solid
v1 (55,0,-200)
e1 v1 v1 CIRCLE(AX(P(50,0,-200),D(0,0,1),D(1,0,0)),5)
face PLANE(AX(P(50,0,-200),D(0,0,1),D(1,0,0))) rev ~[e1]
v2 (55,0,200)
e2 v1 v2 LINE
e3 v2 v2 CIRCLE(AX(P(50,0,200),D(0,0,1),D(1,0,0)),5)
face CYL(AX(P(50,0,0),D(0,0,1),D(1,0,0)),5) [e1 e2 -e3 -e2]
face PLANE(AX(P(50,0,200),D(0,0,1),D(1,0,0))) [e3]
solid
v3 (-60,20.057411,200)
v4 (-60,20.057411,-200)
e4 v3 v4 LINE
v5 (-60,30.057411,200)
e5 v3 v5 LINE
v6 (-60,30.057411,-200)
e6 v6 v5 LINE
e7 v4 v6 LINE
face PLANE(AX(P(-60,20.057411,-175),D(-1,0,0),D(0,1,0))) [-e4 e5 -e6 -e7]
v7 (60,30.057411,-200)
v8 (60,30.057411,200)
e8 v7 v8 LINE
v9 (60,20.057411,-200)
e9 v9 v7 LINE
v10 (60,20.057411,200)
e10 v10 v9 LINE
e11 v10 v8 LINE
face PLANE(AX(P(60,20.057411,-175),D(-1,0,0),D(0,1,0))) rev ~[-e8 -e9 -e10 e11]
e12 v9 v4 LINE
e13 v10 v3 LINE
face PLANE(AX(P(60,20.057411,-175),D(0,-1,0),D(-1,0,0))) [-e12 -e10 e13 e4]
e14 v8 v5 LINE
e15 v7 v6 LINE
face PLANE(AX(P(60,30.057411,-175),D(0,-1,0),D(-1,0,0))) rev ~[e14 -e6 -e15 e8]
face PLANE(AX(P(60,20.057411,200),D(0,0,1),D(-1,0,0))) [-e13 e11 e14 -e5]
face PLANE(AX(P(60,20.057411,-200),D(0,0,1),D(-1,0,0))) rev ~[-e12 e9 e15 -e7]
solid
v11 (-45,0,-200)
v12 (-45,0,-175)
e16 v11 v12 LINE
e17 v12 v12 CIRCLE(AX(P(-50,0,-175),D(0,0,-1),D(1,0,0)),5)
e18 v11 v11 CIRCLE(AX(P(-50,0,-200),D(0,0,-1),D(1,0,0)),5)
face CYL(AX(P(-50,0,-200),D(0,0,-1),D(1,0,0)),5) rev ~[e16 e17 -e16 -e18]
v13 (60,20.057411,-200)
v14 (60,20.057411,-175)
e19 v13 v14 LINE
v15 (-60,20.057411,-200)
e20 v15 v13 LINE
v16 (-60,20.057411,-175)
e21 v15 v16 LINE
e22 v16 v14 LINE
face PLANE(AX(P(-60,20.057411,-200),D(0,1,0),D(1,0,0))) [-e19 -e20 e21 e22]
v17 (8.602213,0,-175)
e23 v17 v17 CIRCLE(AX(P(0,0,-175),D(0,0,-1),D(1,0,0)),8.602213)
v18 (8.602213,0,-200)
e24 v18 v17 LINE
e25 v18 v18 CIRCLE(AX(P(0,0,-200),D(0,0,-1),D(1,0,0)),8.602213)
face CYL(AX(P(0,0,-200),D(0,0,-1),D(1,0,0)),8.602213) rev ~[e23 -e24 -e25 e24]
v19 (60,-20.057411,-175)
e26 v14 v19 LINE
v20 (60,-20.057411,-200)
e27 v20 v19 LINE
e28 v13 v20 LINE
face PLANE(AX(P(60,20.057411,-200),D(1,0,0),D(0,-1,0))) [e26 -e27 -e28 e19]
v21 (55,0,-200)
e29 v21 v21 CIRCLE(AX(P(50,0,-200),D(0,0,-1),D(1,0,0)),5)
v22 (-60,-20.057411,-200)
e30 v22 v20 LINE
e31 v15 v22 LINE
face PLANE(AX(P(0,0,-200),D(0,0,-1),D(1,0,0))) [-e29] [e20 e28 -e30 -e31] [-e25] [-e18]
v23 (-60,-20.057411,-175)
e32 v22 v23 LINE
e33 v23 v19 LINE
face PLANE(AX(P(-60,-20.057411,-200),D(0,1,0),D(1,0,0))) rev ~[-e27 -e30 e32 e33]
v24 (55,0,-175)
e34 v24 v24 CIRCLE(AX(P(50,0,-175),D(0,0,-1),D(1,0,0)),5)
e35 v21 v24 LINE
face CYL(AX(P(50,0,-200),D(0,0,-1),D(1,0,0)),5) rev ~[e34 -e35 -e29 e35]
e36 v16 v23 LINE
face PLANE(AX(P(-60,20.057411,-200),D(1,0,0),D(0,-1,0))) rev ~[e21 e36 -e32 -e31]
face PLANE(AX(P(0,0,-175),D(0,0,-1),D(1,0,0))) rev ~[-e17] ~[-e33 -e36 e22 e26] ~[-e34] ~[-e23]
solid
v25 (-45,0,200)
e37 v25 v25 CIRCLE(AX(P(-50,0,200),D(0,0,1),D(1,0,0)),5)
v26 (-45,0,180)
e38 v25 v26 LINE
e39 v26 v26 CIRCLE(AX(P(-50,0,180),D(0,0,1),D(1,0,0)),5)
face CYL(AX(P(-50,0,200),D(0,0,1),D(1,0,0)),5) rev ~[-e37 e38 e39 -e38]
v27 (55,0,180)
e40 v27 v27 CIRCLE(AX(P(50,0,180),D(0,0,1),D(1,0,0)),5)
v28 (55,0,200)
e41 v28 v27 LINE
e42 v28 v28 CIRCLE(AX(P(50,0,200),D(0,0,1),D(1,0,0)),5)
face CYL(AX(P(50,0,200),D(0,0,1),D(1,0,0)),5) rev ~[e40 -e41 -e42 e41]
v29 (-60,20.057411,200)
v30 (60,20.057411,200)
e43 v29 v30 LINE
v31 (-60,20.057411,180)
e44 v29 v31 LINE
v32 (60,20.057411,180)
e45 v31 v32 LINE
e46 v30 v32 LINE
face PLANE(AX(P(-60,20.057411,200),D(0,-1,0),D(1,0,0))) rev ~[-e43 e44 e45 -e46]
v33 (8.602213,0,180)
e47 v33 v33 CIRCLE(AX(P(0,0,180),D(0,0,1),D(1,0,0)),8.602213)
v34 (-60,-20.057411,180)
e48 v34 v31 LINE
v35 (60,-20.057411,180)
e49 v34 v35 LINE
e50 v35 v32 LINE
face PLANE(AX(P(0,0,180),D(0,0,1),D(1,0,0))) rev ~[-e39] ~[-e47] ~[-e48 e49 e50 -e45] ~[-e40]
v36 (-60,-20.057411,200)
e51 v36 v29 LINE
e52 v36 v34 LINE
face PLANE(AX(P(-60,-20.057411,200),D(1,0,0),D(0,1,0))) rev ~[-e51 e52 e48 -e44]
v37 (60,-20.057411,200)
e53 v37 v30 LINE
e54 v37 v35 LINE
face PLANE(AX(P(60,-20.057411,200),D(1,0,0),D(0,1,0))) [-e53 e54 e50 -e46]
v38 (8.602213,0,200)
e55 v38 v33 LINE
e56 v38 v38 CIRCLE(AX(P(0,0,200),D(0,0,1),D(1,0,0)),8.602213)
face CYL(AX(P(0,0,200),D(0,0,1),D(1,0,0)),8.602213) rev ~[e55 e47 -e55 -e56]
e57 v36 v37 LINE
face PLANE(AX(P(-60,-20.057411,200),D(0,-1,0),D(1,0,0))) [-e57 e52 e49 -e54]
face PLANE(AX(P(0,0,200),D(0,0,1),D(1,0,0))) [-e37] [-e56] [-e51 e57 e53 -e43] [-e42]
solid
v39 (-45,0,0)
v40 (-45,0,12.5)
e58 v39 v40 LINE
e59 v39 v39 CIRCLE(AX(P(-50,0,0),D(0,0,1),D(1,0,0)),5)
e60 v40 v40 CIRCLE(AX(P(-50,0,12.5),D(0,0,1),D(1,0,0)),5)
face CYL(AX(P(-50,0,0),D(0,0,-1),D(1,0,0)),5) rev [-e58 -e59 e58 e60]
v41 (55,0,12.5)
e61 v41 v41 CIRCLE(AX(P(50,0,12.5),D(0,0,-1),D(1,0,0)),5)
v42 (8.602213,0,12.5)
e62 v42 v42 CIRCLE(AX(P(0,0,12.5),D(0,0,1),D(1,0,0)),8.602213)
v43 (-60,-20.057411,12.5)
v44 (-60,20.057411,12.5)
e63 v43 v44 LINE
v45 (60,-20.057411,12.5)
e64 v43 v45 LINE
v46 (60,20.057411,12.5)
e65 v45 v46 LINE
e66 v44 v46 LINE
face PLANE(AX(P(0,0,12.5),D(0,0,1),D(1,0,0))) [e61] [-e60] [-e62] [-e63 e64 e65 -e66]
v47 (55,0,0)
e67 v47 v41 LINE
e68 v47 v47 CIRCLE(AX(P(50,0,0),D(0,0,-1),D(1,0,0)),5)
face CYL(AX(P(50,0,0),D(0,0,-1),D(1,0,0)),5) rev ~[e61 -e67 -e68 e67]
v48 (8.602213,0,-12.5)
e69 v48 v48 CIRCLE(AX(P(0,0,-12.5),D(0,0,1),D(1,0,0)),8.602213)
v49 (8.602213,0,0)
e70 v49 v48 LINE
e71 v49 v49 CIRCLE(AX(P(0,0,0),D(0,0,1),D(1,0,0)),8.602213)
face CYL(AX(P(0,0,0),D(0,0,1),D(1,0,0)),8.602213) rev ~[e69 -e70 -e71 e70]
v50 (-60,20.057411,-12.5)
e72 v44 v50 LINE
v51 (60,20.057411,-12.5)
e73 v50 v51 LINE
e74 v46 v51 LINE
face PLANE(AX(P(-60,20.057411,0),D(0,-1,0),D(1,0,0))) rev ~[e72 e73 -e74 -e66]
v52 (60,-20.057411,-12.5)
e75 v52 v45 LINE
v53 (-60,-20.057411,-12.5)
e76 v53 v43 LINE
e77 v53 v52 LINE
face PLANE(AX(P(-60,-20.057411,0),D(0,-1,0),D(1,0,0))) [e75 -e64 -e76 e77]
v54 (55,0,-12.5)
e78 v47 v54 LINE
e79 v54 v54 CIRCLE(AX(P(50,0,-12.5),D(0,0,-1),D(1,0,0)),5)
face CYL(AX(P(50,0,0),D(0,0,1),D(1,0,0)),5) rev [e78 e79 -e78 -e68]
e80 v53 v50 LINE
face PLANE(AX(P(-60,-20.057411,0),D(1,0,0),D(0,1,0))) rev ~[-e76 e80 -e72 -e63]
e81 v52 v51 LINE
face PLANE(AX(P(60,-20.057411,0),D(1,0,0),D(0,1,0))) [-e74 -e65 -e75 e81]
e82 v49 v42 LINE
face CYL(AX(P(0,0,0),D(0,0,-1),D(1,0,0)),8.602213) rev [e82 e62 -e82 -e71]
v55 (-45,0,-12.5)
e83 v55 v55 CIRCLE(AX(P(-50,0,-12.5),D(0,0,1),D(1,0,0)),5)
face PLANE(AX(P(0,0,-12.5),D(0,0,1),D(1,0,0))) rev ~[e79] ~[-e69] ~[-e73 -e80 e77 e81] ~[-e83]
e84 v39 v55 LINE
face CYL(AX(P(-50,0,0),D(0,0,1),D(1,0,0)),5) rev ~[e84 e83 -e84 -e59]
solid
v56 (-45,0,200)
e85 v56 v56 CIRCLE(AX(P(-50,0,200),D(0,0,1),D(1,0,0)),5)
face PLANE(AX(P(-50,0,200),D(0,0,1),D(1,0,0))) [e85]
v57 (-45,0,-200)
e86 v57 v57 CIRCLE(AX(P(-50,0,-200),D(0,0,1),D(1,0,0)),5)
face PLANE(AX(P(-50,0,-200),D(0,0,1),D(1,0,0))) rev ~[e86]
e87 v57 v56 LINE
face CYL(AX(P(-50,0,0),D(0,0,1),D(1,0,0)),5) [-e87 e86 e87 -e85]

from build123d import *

# Parameters (mm, degrees)
F0_R     = 5
F1_DEPTH = 200
F2_W     = 120
F2_H     = 40.1148218211
F2_R     = 5
F2_R_2   = 8.6022132759
F4_DEPTH = 20
F3_W     = 120
F3_H     = 40.1148218211
F3_R     = 5
F3_R_2   = 8.6022132759
F5_DEPTH = 25
F6_W     = 120
F6_H     = 25
F7_DEPTH = 10
F6_H_2   = 20
F8_DEPTH = 355
F0_W     = 120
F0_H     = 40.1148218211
F0_R_2   = 8.6022132759
F9_DEPTH = 12.5


with BuildPart() as f1:
    # F0 (on Top) → F1 (new body, symmetric)
    with BuildSketch(Plane.XY):
        with Locations((-50, 0)):
            Circle(F0_R)
    extrude(amount=F1_DEPTH, both=True)


with BuildPart() as f1b:
    # F0 (on Top) → F1, piece 2 (new body, symmetric)
    with BuildSketch(Plane.XY):
        with BuildLine():
            ThreePointArc((45, 0), (50, -5), (55, 0))
            ThreePointArc((55, 0), (50, 5), (45, 0))
        make_face()
    extrude(amount=F1_DEPTH, both=True)


with BuildPart() as f4:
    # F2 (on face) → F4 (new body)
    with BuildSketch(Plane.XY.offset(200)):
        Rectangle(F2_W, F2_H)
        with Locations((-50, 0)):
            Circle(F2_R, mode=Mode.SUBTRACT)
        Circle(F2_R_2, mode=Mode.SUBTRACT)
        with Locations((50, 0)):
            Circle(F2_R, mode=Mode.SUBTRACT)
    extrude(amount=-F4_DEPTH)


with BuildPart() as f5:
    # F3 (on face) → F5 (new body)
    with BuildSketch(Plane(origin=(0, 0, -200), x_dir=(1, 0, 0), z_dir=(0, 0, -1))):
        Rectangle(F3_W, F3_H)
        with Locations((-50, 0)):
            Circle(F3_R, mode=Mode.SUBTRACT)
        Circle(F3_R_2, mode=Mode.SUBTRACT)
        with Locations((50, 0)):
            Circle(F3_R, mode=Mode.SUBTRACT)
    extrude(amount=-F5_DEPTH)


with BuildPart() as f7:
    # F6 (on face) → F7 (new body)
    with BuildSketch(Plane(origin=(0, 20.0574109105, 0), x_dir=(-1, 0, 0), z_dir=(0, 1, 0))):
        with Locations((0, -187.5)):
            Rectangle(F6_W, F6_H)
    extrude(amount=F7_DEPTH)

    # F8 (add, through all): a face of the model
    f8_faces = [f7.faces().sort_by_distance(p)[0] for p in [
        (0, 25.0574109105, -175),
    ]]


with BuildPart() as f7b:
    # F6 (on face) → F7, piece 2 (new body)
    with BuildSketch(Plane(origin=(0, 20.0574109105, 0), x_dir=(-1, 0, 0), z_dir=(0, 1, 0))):
        with Locations((0, 190)):
            Rectangle(F6_W, F6_H_2)
    extrude(amount=F7_DEPTH)


with BuildPart() as f7_1:
    add(f7.part)

    add(f7b.part)  # F8 merges F7b
    extrude(f8_faces, amount=F8_DEPTH)


with BuildPart() as f9:
    # F0 (on Top) → F9 (new body, symmetric)
    with BuildSketch(Plane.XY):
        Rectangle(F0_W, F0_H)
        with Locations((-50, 0)):
            Circle(F0_R, mode=Mode.SUBTRACT)
        Circle(F0_R_2, mode=Mode.SUBTRACT)
        with BuildLine():
            ThreePointArc((45, 0), (50, 5), (55, 0))
            ThreePointArc((55, 0), (50, -5), (45, 0))
        make_face(mode=Mode.SUBTRACT)
    extrude(amount=F9_DEPTH, both=True)


solid = Compound([f1.part, f1b.part, f4.part, f5.part, f7_1.part, f9.part])
